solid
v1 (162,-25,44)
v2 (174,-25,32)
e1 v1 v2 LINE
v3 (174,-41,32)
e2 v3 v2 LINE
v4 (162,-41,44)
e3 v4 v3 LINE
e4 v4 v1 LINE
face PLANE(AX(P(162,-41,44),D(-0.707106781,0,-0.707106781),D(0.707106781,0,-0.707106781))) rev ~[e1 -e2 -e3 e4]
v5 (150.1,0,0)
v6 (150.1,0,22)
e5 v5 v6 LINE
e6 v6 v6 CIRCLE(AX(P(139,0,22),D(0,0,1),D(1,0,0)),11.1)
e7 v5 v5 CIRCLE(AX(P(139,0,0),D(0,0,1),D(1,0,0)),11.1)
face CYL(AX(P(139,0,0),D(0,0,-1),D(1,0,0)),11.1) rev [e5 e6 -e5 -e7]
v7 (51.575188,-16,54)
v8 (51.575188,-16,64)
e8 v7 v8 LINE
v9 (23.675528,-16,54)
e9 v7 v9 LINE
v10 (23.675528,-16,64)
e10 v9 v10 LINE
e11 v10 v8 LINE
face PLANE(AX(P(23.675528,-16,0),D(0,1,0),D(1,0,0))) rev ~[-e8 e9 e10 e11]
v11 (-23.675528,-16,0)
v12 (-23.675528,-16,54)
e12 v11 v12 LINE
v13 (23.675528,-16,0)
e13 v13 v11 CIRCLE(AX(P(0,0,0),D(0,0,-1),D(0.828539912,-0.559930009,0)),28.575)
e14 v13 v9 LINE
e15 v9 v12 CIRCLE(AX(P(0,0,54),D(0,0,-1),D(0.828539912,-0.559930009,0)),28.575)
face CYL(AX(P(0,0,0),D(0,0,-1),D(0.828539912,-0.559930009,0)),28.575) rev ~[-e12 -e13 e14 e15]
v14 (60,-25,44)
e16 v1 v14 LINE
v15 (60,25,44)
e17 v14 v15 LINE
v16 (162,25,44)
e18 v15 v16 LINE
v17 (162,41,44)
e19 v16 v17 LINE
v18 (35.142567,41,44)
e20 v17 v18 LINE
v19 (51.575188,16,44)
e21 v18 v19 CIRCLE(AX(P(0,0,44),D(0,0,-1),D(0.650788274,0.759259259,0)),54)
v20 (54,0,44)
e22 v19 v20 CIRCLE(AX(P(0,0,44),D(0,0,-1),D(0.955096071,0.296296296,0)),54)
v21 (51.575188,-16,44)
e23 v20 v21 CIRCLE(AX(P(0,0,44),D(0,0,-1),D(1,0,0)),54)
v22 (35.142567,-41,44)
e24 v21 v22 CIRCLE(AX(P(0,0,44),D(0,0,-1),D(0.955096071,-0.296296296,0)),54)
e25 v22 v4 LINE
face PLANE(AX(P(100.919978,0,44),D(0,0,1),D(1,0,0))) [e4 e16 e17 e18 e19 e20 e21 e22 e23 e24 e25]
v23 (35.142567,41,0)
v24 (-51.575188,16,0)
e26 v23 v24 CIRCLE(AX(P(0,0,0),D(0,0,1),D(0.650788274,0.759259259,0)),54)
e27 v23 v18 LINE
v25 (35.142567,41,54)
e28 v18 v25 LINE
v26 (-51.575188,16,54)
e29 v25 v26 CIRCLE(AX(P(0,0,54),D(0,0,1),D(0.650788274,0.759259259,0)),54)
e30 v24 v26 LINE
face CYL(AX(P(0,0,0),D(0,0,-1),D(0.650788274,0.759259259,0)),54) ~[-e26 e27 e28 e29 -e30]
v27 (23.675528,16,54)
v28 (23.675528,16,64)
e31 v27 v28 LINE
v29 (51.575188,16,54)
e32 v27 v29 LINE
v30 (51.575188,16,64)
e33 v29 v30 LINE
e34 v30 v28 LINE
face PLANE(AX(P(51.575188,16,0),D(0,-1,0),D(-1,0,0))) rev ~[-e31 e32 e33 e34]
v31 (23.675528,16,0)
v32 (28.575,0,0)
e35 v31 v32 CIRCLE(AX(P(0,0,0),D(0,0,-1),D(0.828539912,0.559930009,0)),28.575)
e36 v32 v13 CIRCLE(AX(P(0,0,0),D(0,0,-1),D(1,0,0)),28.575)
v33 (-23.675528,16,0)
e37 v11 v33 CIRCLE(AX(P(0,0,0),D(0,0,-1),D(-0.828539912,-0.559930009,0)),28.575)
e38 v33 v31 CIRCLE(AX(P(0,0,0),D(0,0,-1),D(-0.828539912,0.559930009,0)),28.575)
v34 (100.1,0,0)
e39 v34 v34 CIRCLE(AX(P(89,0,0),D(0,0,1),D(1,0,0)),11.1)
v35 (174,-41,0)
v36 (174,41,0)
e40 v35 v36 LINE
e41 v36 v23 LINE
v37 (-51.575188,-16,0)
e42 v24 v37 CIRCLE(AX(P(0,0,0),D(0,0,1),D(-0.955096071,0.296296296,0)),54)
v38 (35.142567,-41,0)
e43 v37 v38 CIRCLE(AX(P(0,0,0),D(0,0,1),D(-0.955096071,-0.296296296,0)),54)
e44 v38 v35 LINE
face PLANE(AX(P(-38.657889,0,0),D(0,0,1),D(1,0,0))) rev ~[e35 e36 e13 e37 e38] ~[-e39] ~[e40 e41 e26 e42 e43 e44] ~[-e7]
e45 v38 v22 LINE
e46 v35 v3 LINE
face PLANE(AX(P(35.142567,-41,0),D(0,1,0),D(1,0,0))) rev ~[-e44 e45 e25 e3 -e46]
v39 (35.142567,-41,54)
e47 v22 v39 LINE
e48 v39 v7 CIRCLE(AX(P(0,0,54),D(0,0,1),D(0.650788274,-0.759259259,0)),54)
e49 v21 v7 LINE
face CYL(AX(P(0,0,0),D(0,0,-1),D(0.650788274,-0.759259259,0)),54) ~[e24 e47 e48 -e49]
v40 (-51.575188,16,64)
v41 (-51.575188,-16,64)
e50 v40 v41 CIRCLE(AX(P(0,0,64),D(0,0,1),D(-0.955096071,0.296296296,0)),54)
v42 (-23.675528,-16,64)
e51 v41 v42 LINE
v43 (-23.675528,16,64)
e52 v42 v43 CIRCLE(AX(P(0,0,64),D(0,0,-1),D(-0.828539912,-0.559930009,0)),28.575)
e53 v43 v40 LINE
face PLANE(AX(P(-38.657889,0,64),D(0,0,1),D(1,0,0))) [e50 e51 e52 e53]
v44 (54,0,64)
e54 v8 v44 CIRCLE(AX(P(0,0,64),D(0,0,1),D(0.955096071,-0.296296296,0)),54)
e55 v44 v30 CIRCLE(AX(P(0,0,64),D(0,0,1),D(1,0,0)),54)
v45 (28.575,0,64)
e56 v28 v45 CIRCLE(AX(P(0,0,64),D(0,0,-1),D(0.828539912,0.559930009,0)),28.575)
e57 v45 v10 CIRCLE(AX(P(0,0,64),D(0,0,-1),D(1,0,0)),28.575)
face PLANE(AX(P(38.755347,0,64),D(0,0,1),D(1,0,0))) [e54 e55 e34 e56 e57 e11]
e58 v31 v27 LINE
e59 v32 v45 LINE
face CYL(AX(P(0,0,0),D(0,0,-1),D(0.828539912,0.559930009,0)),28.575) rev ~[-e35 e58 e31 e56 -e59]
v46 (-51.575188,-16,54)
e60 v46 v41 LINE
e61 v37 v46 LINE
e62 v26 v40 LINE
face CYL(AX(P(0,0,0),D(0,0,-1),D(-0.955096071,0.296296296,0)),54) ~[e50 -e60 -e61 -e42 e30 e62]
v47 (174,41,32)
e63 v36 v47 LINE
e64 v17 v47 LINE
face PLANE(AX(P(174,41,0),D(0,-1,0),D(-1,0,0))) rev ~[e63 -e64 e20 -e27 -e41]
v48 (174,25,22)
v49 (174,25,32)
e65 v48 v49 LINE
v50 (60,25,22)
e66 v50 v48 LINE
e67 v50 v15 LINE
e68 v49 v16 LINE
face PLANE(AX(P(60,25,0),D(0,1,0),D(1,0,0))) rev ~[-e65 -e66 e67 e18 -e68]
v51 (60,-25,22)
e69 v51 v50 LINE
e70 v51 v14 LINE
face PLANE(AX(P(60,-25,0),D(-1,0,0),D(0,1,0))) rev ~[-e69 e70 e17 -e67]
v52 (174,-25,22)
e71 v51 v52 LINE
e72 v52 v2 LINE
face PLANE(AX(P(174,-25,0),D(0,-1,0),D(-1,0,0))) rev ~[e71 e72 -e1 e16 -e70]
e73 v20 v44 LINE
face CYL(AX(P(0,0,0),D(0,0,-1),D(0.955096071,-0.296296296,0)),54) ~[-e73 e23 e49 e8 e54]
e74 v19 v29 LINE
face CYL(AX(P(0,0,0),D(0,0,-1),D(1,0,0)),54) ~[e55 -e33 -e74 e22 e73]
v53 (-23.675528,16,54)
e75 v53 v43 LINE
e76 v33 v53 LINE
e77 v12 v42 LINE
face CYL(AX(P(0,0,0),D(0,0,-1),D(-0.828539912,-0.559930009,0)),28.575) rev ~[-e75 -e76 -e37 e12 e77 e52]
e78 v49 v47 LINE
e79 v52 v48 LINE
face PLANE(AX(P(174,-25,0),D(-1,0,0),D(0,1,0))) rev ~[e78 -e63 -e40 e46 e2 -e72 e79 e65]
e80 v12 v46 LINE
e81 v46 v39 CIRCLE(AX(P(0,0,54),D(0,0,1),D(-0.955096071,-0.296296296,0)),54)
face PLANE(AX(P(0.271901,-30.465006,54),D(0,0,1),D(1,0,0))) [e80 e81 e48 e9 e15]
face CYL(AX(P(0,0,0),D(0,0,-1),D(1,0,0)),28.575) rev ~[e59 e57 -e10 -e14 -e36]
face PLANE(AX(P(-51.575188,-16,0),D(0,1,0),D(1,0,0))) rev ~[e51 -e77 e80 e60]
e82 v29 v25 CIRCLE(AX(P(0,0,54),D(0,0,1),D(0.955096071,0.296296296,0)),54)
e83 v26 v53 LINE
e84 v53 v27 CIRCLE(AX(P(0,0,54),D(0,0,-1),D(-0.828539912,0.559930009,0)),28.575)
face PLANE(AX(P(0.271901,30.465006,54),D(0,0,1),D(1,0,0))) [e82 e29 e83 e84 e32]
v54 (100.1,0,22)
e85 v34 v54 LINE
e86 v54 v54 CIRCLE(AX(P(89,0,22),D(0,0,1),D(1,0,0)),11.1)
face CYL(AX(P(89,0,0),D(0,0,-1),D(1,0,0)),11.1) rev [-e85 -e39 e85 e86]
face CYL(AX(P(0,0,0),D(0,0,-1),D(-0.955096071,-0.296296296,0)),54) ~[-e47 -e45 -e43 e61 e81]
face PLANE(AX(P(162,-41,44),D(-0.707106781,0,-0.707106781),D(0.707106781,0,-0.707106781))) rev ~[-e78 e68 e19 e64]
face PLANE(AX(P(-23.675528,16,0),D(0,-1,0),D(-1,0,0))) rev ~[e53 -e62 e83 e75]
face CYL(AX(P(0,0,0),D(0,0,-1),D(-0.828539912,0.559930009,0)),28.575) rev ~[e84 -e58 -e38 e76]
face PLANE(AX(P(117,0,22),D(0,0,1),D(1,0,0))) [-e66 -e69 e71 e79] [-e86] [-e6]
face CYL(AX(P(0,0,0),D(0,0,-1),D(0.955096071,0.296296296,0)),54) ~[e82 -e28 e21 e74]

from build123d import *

# Parameters (mm, degrees)
F1_DEPTH = 44
F0_W     = 114
F0_H     = 50
F0_R     = 11.1
F2_DEPTH = 22
F3_DEPTH = 54
F4_DEPTH = 64
F6_DEPTH = 95.001


# Not quite as in the source:
# - a feature names something its author has since deleted; it is built from what else it names


with BuildPart() as f1:
    # F0 (on Top) → F1 (new body)
    with BuildSketch(Plane.XY):
        with BuildLine():
            ThreePointArc((51.5751878329, 16), (53.3903556037, 8.0913489921), (54, 0))
            ThreePointArc((54, 0), (53.3903556037, -8.0913489921), (51.5751878329, -16))
            ThreePointArc((51.5751878329, -16), (45.1247409006, -29.6607106903), (35.1425667816, -41))
            Line((35.1425667816, -41), (174, -41))
            Line((174, -41), (174, -25))
            Line((174, -25), (60, -25))
            Line((60, -25), (60, 25))
            Line((60, 25), (174, 25))
            Line((174, 25), (174, 41))
            Line((174, 41), (35.1425667816, 41))
            ThreePointArc((35.1425667816, 41), (45.1247409006, 29.6607106903), (51.5751878329, 16))
        make_face()
    extrude(amount=F1_DEPTH)

    # F0 (on Top) → F2 (join)
    with BuildSketch(Plane.XY):
        with Locations((117, 0)):
            Rectangle(F0_W, F0_H)
        with Locations((89, 0)):
            Circle(F0_R, mode=Mode.SUBTRACT)
        with Locations((139, 0)):
            Circle(F0_R, mode=Mode.SUBTRACT)
    extrude(amount=F2_DEPTH)

    # F0 (on Top) → F3 (join)
    with BuildSketch(Plane.XY):
        with BuildLine():
            ThreePointArc((35.1425667816, -41), (45.1247409006, -29.6607106903), (51.5751878329, -16))
            Line((51.5751878329, -16), (23.6755279772, -16))
            ThreePointArc((23.6755279772, -16), (0, -28.575), (-23.6755279772, -16))
            Line((-23.6755279772, -16), (-51.5751878329, -16))
            ThreePointArc((-51.5751878329, -16), (-14.9585346426, -51.8868214612), (35.1425667816, -41))
        make_face()
        with BuildLine():
            Line((23.6755279772, 16), (51.5751878329, 16))
            ThreePointArc((51.5751878329, 16), (45.1247409006, 29.6607106903), (35.1425667816, 41))
            ThreePointArc((35.1425667816, 41), (-14.9585346426, 51.8868214612), (-51.5751878329, 16))
            Line((-51.5751878329, 16), (-23.6755279772, 16))
            ThreePointArc((-23.6755279772, 16), (0, 28.575), (23.6755279772, 16))
        make_face()
    extrude(amount=F3_DEPTH)

    # F0 (on Top) → F4 (join)
    with BuildSketch(Plane.XY):
        with BuildLine():
            Line((-23.6755279772, 16), (-51.5751878329, 16))
            ThreePointArc((-51.5751878329, 16), (-54, 0), (-51.5751878329, -16))
            Line((-51.5751878329, -16), (-23.6755279772, -16))
            ThreePointArc((-23.6755279772, -16), (-28.575, 0), (-23.6755279772, 16))
        make_face()
        with BuildLine():
            ThreePointArc((51.5751878329, -16), (53.3903556037, -8.0913489921), (54, 0))
            ThreePointArc((54, 0), (53.3903556037, 8.0913489921), (51.5751878329, 16))
            Line((51.5751878329, 16), (23.6755279772, 16))
            ThreePointArc((23.6755279772, 16), (27.3226905424, 8.3666723687), (28.575, 0))
            ThreePointArc((28.575, 0), (27.3226905424, -8.3666723687), (23.6755279772, -16))
            Line((23.6755279772, -16), (51.5751878329, -16))
        make_face()
    extrude(amount=F4_DEPTH)

    # F5 (on face) → F6 (cut, through all)
    with BuildSketch(Plane.XZ.offset(41)):
        Polygon((174, 44), (162, 44), (174, 32), align=None)
    extrude(amount=-F6_DEPTH, mode=Mode.SUBTRACT)


solid = f1.part
